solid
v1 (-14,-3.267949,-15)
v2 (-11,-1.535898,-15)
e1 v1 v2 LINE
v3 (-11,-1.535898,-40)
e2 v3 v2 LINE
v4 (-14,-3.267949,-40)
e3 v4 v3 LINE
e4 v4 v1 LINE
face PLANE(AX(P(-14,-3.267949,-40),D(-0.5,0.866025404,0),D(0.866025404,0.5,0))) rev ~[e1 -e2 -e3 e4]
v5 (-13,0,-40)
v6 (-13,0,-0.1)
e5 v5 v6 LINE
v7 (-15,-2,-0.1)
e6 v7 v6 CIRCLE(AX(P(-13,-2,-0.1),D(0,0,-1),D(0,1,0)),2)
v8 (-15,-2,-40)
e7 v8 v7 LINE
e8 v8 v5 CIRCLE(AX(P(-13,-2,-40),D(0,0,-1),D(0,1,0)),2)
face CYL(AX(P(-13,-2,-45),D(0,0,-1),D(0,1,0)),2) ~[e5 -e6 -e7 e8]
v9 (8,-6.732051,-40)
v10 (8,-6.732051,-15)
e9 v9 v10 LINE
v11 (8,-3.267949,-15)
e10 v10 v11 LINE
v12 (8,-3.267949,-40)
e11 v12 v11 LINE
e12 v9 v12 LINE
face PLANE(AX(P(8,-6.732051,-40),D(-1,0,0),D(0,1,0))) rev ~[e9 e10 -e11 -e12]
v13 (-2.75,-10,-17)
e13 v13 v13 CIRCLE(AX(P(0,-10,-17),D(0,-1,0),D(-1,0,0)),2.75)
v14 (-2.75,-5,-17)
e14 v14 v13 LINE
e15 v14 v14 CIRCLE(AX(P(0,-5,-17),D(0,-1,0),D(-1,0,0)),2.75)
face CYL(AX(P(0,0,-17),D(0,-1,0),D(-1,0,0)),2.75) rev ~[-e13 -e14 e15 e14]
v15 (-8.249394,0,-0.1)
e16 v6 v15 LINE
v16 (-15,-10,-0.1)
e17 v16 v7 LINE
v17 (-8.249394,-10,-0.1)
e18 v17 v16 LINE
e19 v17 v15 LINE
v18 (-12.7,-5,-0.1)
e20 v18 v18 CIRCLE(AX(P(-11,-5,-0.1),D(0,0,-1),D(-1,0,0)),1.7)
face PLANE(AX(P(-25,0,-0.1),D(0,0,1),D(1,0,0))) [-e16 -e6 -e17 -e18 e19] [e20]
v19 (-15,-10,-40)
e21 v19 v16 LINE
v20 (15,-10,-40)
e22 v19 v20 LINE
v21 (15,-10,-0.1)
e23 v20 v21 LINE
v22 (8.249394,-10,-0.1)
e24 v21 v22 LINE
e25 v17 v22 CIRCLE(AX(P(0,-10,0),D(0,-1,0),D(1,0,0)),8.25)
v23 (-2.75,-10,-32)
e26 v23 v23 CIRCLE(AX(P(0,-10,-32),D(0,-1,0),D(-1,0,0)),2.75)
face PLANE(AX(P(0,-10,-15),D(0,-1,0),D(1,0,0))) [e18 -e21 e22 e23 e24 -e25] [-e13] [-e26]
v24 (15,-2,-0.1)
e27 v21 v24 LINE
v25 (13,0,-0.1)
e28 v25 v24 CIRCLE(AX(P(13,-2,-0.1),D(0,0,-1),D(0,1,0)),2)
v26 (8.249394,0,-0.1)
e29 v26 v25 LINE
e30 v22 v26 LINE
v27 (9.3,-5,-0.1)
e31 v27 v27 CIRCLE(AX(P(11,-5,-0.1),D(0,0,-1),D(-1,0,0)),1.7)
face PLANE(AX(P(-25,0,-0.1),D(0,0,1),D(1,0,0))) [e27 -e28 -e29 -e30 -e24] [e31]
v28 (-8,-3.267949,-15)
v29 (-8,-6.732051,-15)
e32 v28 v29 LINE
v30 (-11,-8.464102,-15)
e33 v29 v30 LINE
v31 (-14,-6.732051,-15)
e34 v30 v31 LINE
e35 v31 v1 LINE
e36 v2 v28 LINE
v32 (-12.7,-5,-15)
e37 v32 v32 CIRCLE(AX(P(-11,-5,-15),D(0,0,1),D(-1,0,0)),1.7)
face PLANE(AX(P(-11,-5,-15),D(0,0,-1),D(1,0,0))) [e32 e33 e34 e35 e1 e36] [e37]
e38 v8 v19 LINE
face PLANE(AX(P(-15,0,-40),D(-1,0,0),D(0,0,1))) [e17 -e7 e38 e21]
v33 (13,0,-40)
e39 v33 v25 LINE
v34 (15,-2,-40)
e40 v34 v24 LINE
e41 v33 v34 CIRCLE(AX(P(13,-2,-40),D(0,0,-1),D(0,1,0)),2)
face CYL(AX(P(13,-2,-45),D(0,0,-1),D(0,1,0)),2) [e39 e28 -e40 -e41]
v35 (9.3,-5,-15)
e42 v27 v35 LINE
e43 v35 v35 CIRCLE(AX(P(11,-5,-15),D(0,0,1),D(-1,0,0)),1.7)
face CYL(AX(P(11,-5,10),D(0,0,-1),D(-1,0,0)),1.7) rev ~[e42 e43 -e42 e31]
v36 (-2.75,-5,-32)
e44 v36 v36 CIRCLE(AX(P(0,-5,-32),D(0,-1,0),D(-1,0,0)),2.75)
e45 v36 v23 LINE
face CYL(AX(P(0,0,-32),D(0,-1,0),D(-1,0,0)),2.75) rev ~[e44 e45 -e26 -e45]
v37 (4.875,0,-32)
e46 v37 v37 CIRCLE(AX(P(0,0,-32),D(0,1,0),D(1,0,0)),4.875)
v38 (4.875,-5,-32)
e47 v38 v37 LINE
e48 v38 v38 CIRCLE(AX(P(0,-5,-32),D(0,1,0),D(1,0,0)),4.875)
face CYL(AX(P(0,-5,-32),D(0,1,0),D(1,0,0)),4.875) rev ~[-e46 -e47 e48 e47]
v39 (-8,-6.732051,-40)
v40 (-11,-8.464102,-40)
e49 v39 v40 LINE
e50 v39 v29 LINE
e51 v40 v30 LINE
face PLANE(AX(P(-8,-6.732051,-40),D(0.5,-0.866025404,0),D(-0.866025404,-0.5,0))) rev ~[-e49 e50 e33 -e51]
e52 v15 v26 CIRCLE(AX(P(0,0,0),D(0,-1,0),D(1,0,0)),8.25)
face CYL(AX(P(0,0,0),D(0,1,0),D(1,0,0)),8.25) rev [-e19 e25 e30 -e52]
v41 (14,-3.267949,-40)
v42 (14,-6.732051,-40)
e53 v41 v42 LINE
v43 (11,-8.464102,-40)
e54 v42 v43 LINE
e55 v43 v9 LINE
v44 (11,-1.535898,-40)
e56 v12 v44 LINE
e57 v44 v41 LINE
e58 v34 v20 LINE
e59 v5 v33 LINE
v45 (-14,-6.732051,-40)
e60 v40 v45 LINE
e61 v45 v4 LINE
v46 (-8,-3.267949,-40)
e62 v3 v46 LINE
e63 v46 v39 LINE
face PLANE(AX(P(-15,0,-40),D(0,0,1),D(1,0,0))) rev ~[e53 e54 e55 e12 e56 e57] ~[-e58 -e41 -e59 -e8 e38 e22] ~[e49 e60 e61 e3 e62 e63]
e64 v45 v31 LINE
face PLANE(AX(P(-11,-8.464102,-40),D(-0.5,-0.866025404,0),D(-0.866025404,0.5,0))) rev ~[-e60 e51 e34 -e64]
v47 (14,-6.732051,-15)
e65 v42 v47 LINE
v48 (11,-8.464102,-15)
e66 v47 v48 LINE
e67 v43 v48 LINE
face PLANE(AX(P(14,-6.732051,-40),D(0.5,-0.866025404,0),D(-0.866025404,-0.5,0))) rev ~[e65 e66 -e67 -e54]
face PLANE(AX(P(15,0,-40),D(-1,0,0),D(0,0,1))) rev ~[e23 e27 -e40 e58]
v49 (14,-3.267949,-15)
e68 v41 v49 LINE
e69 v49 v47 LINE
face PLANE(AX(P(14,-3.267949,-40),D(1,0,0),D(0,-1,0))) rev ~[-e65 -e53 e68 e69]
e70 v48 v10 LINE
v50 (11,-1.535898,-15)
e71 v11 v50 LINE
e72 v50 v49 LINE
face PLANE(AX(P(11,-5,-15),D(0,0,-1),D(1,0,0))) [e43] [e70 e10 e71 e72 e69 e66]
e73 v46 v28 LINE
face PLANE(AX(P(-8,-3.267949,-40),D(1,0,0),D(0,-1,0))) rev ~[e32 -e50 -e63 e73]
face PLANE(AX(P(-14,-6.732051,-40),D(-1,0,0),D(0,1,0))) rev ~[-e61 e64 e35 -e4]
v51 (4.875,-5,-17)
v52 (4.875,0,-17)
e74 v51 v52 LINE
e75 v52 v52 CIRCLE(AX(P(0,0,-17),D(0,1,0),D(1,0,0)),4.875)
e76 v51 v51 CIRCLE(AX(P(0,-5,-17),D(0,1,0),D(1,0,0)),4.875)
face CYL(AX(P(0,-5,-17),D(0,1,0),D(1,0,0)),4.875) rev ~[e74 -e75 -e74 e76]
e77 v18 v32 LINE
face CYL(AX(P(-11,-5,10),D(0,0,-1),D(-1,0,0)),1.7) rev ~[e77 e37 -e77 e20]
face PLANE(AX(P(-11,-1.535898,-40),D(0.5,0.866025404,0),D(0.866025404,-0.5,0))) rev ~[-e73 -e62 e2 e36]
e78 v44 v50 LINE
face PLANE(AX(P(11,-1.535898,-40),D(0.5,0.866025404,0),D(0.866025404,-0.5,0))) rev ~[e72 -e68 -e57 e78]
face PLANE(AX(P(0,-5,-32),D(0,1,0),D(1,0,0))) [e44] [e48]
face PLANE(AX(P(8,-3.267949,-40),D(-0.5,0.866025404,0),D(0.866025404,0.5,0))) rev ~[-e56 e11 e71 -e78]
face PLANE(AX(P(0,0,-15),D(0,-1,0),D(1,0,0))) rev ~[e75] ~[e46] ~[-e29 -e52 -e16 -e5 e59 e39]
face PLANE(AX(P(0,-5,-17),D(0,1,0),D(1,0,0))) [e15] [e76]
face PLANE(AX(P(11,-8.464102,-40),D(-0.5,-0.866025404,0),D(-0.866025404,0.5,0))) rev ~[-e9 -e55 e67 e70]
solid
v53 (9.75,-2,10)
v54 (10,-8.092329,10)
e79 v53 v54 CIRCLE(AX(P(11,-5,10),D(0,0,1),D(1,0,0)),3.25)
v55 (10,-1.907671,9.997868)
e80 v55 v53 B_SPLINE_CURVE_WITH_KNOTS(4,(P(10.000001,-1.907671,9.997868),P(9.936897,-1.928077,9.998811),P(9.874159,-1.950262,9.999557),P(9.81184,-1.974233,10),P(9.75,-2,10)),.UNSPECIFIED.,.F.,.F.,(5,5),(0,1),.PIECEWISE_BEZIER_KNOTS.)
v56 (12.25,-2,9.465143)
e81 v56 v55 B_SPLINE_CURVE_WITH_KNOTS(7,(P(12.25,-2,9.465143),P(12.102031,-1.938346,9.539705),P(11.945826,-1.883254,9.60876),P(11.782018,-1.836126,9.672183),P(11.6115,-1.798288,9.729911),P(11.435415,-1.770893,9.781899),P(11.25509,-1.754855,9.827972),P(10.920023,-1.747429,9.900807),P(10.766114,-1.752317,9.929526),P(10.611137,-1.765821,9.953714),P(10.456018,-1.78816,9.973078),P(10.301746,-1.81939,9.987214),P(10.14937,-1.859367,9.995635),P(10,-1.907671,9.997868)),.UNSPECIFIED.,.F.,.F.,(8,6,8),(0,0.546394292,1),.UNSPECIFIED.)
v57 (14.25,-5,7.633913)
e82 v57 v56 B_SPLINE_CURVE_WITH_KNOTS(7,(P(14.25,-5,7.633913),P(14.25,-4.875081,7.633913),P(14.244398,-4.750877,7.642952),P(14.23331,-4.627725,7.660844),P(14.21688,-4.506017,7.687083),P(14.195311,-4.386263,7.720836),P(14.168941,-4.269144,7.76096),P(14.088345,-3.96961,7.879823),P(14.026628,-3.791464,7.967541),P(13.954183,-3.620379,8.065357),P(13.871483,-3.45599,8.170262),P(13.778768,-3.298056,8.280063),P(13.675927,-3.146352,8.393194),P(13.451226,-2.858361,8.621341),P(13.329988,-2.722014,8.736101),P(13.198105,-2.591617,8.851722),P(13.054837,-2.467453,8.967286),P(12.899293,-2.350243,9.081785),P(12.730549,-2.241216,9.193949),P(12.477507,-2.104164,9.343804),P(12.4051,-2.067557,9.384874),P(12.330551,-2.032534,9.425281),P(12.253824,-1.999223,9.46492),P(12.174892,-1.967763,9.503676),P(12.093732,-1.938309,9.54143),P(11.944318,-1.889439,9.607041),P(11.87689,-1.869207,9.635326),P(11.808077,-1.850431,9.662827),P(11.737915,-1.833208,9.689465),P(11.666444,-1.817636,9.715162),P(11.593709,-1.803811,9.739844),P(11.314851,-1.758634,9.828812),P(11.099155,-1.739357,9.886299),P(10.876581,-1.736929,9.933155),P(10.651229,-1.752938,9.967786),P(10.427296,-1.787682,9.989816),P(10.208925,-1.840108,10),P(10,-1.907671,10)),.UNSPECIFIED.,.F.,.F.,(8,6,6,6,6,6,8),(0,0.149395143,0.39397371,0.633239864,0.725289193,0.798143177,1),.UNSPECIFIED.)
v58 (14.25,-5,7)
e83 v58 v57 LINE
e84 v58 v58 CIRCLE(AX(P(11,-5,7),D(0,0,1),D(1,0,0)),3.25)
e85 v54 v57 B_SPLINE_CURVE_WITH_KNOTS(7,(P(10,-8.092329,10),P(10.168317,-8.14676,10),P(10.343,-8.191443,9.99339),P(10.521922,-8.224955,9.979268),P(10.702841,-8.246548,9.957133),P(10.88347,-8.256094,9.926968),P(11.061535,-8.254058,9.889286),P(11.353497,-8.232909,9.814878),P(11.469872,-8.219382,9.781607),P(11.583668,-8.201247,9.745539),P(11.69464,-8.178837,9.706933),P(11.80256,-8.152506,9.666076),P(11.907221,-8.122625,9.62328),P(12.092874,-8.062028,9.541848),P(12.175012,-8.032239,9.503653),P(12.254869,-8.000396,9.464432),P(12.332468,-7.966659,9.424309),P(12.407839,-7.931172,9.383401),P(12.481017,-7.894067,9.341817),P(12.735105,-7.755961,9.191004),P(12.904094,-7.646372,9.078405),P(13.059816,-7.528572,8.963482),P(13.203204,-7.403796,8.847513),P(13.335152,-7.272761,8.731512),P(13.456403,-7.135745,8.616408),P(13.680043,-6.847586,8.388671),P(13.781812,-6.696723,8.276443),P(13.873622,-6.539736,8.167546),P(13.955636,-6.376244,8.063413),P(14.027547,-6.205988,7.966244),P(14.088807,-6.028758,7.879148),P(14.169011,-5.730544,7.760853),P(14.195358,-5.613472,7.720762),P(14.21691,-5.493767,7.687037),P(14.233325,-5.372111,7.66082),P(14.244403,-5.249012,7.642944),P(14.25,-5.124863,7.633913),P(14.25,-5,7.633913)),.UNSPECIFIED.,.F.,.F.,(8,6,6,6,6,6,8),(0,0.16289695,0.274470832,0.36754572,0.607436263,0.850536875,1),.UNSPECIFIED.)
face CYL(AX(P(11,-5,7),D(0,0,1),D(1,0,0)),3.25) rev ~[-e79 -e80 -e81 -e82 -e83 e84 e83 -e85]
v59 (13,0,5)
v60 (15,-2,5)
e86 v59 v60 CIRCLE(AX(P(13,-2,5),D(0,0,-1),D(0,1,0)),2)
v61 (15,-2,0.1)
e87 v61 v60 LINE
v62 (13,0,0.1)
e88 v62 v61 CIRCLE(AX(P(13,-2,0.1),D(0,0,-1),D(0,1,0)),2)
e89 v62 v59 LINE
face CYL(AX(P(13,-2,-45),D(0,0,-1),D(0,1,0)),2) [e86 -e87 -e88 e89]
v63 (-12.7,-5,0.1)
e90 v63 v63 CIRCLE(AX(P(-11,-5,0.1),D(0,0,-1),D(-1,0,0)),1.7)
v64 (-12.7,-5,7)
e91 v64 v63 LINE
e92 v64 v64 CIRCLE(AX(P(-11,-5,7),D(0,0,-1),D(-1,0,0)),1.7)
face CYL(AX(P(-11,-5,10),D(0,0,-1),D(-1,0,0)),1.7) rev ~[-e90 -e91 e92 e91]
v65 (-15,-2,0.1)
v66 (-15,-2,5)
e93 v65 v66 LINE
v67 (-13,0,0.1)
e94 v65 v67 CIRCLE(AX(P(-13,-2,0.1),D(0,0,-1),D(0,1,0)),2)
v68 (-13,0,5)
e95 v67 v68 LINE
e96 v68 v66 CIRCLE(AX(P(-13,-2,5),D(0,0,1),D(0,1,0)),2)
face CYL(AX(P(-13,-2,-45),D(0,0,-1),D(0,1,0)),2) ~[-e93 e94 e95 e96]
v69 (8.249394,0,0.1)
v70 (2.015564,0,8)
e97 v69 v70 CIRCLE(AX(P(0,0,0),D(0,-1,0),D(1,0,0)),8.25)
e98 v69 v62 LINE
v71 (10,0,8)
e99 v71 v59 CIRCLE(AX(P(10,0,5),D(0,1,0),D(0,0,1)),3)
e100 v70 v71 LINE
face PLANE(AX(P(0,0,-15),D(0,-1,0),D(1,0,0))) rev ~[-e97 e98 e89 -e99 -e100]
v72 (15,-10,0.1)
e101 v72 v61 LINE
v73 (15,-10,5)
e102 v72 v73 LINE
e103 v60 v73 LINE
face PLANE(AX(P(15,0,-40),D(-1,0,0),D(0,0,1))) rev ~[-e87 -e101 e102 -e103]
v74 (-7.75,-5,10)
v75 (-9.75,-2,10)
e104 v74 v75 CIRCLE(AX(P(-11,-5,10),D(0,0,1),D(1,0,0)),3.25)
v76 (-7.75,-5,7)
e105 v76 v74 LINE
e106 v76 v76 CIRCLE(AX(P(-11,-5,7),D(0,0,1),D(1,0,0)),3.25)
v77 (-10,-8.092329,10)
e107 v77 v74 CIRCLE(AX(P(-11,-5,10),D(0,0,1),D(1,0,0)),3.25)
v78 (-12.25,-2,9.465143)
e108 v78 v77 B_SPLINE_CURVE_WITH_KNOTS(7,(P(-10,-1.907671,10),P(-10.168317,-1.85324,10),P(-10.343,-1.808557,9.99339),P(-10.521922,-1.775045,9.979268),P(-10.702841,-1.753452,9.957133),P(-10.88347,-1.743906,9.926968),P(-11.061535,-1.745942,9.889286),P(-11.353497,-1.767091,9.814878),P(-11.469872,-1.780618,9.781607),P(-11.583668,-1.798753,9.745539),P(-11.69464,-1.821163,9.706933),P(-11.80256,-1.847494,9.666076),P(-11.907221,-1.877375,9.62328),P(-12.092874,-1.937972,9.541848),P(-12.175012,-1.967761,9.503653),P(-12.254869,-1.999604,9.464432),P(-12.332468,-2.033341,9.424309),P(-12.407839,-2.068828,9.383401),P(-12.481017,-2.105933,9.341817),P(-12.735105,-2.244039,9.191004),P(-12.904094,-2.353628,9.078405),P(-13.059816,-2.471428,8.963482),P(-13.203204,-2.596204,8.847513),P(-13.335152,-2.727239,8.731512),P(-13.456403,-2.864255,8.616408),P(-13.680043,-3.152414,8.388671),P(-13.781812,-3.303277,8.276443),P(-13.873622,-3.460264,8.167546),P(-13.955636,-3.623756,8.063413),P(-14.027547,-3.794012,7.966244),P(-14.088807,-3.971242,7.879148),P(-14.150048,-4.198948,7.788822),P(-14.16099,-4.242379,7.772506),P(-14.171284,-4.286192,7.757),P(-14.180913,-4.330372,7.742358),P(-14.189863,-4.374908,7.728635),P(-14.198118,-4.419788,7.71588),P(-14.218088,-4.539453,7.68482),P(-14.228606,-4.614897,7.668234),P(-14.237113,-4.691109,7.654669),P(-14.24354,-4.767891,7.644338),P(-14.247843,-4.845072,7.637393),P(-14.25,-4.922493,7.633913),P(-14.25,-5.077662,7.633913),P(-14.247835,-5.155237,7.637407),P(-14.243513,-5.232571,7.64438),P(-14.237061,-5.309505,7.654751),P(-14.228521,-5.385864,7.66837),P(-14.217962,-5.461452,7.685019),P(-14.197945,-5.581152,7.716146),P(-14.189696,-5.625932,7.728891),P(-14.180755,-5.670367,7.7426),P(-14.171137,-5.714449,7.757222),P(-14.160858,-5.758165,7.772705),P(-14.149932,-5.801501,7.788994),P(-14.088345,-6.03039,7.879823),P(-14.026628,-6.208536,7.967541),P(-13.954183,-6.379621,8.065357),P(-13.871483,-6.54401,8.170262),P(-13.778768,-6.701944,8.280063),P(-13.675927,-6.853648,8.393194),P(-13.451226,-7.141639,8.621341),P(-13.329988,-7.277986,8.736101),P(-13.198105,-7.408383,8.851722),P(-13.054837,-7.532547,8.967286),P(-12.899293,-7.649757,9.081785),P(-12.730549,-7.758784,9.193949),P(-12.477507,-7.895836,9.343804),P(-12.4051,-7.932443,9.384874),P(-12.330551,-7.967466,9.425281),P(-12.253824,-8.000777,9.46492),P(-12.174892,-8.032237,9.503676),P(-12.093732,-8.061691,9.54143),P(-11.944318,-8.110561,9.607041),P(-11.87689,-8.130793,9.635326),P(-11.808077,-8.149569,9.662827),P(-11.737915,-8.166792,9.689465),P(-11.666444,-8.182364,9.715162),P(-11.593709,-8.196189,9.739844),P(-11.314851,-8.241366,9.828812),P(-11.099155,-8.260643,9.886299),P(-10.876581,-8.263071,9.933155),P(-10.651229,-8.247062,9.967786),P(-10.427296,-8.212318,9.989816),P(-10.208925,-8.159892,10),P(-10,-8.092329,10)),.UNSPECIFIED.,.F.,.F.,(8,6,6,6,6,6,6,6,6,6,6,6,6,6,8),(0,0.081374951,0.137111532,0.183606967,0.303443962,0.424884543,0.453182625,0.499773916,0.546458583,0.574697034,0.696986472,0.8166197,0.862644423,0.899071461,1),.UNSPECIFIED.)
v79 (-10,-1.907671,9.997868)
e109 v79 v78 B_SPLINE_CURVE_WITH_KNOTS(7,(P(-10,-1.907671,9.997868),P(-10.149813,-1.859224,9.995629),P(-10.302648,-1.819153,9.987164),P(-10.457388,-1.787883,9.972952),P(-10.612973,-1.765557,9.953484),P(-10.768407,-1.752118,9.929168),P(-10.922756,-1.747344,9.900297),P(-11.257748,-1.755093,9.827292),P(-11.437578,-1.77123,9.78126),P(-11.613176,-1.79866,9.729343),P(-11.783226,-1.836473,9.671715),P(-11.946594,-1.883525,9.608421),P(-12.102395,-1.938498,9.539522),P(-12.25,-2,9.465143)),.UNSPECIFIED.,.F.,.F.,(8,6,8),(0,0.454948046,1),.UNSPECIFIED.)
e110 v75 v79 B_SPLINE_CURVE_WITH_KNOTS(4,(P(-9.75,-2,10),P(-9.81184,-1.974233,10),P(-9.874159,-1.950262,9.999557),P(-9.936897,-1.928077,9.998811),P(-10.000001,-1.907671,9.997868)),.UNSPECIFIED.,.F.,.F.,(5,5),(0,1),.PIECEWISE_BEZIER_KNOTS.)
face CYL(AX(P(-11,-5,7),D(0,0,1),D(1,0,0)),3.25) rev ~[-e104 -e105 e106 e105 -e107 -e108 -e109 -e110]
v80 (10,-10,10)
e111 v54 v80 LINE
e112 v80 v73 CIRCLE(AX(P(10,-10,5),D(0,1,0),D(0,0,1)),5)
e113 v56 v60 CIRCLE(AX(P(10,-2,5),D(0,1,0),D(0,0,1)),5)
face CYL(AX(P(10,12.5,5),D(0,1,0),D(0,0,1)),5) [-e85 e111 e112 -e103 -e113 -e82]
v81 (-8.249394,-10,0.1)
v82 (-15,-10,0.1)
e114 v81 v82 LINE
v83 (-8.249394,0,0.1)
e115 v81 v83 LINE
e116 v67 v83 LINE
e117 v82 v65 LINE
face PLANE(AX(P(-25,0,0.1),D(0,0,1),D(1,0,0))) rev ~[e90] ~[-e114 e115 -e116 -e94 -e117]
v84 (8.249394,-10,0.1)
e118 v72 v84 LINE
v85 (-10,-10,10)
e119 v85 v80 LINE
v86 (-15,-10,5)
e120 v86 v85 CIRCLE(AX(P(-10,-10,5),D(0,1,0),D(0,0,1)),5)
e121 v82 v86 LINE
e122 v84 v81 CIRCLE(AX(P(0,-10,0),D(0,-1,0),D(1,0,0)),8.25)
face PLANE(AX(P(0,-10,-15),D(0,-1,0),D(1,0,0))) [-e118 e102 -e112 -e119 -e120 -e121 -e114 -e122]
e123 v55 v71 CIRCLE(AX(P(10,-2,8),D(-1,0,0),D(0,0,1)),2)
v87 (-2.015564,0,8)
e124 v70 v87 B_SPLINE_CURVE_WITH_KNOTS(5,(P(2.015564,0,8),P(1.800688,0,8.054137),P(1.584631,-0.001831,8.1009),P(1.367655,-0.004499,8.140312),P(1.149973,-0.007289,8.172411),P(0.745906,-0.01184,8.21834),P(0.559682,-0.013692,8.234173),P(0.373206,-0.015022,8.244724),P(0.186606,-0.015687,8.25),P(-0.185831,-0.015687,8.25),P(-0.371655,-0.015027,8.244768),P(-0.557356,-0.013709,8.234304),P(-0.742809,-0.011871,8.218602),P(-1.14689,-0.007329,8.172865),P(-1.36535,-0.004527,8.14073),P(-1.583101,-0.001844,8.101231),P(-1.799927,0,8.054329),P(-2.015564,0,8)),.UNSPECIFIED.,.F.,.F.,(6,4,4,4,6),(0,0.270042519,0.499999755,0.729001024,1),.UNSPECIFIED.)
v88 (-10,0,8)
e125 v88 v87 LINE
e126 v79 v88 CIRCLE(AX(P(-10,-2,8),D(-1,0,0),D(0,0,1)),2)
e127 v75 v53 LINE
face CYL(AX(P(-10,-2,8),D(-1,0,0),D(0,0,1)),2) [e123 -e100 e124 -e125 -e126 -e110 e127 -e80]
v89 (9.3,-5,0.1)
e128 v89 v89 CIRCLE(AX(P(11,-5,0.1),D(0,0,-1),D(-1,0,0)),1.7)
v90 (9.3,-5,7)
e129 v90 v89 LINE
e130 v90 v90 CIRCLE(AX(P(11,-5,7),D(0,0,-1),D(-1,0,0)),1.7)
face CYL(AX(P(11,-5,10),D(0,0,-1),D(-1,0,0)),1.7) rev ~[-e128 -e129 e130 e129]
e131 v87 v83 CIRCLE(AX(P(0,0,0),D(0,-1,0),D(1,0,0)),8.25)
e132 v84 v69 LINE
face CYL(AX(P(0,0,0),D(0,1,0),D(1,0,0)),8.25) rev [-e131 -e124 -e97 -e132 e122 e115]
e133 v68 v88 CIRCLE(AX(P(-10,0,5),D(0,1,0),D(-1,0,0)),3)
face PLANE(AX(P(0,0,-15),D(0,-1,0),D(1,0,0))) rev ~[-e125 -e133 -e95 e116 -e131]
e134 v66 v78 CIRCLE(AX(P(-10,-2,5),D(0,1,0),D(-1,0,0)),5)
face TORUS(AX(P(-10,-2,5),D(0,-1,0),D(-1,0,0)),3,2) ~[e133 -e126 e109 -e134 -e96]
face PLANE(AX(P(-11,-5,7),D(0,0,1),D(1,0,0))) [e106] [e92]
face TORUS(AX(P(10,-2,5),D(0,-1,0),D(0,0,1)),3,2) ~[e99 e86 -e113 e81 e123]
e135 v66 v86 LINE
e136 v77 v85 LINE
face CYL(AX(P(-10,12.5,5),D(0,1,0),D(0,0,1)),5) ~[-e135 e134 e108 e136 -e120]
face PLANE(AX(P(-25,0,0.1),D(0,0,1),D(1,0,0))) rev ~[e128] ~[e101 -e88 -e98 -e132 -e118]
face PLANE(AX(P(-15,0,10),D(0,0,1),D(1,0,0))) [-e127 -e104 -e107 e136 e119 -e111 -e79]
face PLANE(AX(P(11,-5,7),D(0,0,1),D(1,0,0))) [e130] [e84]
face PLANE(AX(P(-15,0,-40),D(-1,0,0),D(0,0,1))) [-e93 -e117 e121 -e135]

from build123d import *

# Parameters (mm, degrees)
F0_W           = 30
F0_H           = 50
F0_R           = 8.25
F1_DEPTH       = 10
F2_D           = 5.5
F2_CBORE_D     = 9.75
F2_CBORE_DEPTH = 5
F4_D           = 3.4
F4_CBORE_D     = 6.5
F4_CBORE_DEPTH = 3
F5_T1_DEPTH    = 35
F6_R           = 1.7
F7_DEPTH       = 25
F8_T1_DEPTH    = 50
F8_T3_DEPTH    = 20
F8_T6_ANGLE    = 89.9999999974
F8_T8_ANGLE    = 89.9999999974
F9_W           = 50
F9_H           = 0.2
F10_DEPTH      = 25


# Not quite as in the source:
# - a fillet or chamfer that OpenCascade refuses, or shapes differently, is made with other operations: its cross-section is extruded or revolved along the edge and cut away or added


with BuildPart() as f1:
    # F0 (on Front) → F1 (new body)
    with BuildSketch(Plane.XZ):
        with Locations((0, -15)):
            Rectangle(F0_W, F0_H)
        Circle(F0_R, mode=Mode.SUBTRACT)
    extrude(amount=F1_DEPTH)

    # F2 (through all)
    with Locations(Plane(origin=(0, 0, 0), x_dir=(1, 0, 0), z_dir=(0, 1, 0))):
        with Locations((0, 17), (0, 32)):
            CounterBoreHole(F2_D / 2, F2_CBORE_D / 2, F2_CBORE_DEPTH)

    # F4 (through all)
    with Locations(Plane.XY.offset(10)):
        with Locations((11, -5), (-11, -5)):
            CounterBoreHole(F4_D / 2, F4_CBORE_D / 2, F4_CBORE_DEPTH)

    # F5: fillet of radius 5 on 2 edges, made by hand

    # F5_s2 → F5_t1 (cut)
    with BuildSketch(Plane.XZ.offset(-12.5)):
        with BuildLine():
            ThreePointArc((10, 10), (13.5355339059, 8.5355339059), (15, 5))
            Line((15, 5), (15, 10))
            Line((15, 10), (10, 10))
        make_face()
        with BuildLine():
            ThreePointArc((-10, 10), (-13.5355339059, 8.5355339059), (-15, 5))
            Line((-15, 5), (-15, 10))
            Line((-15, 10), (-10, 10))
        make_face()
    extrude(amount=F5_T1_DEPTH, mode=Mode.SUBTRACT)

    # F6 (on face) → F7 (cut)
    with BuildSketch(Plane(origin=(0, 0, -40), x_dir=(1, 0, 0), z_dir=(0, 0, -1))):
        Polygon((11, 8.4641016151), (8, 6.7320508076), (8, 3.2679491924), (11, 1.5358983849), (14, 3.2679491924), (14, 6.7320508076), align=None)
        with Locations((11, 5)):
            Circle(F6_R, mode=Mode.SUBTRACT)
        Polygon((-8, 6.7320508076), (-11, 8.4641016151), (-14, 6.7320508076), (-14, 3.2679491924), (-11, 1.5358983849), (-8, 3.2679491924), align=None)
        with Locations((-11, 5)):
            Circle(F6_R, mode=Mode.SUBTRACT)
    extrude(amount=-F7_DEPTH, mode=Mode.SUBTRACT)

    # F8: fillet of radius 2 on 5 edges, made by hand

    # F8_s2 → F8_t1 (cut)
    with BuildSketch(Plane.XY.offset(-45)):
        with BuildLine():
            ThreePointArc((13, 0), (14.4142135624, -0.5857864376), (15, -2))
            Line((15, -2), (15, 0))
            Line((15, 0), (13, 0))
        make_face()
        with BuildLine():
            ThreePointArc((-13, 0), (-14.4142135624, -0.5857864376), (-15, -2))
            Line((-15, -2), (-15, 0))
            Line((-15, 0), (-13, 0))
        make_face()
    extrude(amount=F8_T1_DEPTH, mode=Mode.SUBTRACT)

    # F8_s4 → F8_t3 (cut)
    with BuildSketch(Plane.YZ.offset(-10)):
        with BuildLine():
            ThreePointArc((-2, 10), (-0.5857864376, 9.4142135624), (0, 8))
            Line((0, 8), (0, 10))
            Line((0, 10), (-2, 10))
        make_face()
    extrude(amount=F8_T3_DEPTH, mode=Mode.SUBTRACT)

    # F8_s5 → F8_t6 (revolve, cut)
    with BuildSketch(Plane.YZ.offset(9.9999999999)):
        with BuildLine():
            ThreePointArc((0, 8), (-0.5857864376, 9.4142135624), (-2, 10))
            Line((-2, 10), (0, 10))
            Line((0, 10), (0, 8))
        make_face()
    revolve(axis=Axis((9.9999999999, 0, 4.9999999999), (0, 1, 0)), revolution_arc=F8_T6_ANGLE, mode=Mode.SUBTRACT)

    # F8_s7 → F8_t8 (revolve, cut)
    with BuildSketch(Plane.XY.offset(4.9999999999)):
        with BuildLine():
            ThreePointArc((-13, 0), (-14.4142135624, -0.5857864376), (-15, -2))
            Line((-15, -2), (-15, 0))
            Line((-15, 0), (-13, 0))
        make_face()
    revolve(axis=Axis((-9.9999999999, 0, 4.9999999999), (0, 1, 0)), revolution_arc=F8_T8_ANGLE, mode=Mode.SUBTRACT)

    # F9 (on face) → F10 (cut)
    with BuildSketch(Plane.XZ):
        Rectangle(F9_W, F9_H)
    extrude(amount=F10_DEPTH, mode=Mode.SUBTRACT)


solid = f1.part
